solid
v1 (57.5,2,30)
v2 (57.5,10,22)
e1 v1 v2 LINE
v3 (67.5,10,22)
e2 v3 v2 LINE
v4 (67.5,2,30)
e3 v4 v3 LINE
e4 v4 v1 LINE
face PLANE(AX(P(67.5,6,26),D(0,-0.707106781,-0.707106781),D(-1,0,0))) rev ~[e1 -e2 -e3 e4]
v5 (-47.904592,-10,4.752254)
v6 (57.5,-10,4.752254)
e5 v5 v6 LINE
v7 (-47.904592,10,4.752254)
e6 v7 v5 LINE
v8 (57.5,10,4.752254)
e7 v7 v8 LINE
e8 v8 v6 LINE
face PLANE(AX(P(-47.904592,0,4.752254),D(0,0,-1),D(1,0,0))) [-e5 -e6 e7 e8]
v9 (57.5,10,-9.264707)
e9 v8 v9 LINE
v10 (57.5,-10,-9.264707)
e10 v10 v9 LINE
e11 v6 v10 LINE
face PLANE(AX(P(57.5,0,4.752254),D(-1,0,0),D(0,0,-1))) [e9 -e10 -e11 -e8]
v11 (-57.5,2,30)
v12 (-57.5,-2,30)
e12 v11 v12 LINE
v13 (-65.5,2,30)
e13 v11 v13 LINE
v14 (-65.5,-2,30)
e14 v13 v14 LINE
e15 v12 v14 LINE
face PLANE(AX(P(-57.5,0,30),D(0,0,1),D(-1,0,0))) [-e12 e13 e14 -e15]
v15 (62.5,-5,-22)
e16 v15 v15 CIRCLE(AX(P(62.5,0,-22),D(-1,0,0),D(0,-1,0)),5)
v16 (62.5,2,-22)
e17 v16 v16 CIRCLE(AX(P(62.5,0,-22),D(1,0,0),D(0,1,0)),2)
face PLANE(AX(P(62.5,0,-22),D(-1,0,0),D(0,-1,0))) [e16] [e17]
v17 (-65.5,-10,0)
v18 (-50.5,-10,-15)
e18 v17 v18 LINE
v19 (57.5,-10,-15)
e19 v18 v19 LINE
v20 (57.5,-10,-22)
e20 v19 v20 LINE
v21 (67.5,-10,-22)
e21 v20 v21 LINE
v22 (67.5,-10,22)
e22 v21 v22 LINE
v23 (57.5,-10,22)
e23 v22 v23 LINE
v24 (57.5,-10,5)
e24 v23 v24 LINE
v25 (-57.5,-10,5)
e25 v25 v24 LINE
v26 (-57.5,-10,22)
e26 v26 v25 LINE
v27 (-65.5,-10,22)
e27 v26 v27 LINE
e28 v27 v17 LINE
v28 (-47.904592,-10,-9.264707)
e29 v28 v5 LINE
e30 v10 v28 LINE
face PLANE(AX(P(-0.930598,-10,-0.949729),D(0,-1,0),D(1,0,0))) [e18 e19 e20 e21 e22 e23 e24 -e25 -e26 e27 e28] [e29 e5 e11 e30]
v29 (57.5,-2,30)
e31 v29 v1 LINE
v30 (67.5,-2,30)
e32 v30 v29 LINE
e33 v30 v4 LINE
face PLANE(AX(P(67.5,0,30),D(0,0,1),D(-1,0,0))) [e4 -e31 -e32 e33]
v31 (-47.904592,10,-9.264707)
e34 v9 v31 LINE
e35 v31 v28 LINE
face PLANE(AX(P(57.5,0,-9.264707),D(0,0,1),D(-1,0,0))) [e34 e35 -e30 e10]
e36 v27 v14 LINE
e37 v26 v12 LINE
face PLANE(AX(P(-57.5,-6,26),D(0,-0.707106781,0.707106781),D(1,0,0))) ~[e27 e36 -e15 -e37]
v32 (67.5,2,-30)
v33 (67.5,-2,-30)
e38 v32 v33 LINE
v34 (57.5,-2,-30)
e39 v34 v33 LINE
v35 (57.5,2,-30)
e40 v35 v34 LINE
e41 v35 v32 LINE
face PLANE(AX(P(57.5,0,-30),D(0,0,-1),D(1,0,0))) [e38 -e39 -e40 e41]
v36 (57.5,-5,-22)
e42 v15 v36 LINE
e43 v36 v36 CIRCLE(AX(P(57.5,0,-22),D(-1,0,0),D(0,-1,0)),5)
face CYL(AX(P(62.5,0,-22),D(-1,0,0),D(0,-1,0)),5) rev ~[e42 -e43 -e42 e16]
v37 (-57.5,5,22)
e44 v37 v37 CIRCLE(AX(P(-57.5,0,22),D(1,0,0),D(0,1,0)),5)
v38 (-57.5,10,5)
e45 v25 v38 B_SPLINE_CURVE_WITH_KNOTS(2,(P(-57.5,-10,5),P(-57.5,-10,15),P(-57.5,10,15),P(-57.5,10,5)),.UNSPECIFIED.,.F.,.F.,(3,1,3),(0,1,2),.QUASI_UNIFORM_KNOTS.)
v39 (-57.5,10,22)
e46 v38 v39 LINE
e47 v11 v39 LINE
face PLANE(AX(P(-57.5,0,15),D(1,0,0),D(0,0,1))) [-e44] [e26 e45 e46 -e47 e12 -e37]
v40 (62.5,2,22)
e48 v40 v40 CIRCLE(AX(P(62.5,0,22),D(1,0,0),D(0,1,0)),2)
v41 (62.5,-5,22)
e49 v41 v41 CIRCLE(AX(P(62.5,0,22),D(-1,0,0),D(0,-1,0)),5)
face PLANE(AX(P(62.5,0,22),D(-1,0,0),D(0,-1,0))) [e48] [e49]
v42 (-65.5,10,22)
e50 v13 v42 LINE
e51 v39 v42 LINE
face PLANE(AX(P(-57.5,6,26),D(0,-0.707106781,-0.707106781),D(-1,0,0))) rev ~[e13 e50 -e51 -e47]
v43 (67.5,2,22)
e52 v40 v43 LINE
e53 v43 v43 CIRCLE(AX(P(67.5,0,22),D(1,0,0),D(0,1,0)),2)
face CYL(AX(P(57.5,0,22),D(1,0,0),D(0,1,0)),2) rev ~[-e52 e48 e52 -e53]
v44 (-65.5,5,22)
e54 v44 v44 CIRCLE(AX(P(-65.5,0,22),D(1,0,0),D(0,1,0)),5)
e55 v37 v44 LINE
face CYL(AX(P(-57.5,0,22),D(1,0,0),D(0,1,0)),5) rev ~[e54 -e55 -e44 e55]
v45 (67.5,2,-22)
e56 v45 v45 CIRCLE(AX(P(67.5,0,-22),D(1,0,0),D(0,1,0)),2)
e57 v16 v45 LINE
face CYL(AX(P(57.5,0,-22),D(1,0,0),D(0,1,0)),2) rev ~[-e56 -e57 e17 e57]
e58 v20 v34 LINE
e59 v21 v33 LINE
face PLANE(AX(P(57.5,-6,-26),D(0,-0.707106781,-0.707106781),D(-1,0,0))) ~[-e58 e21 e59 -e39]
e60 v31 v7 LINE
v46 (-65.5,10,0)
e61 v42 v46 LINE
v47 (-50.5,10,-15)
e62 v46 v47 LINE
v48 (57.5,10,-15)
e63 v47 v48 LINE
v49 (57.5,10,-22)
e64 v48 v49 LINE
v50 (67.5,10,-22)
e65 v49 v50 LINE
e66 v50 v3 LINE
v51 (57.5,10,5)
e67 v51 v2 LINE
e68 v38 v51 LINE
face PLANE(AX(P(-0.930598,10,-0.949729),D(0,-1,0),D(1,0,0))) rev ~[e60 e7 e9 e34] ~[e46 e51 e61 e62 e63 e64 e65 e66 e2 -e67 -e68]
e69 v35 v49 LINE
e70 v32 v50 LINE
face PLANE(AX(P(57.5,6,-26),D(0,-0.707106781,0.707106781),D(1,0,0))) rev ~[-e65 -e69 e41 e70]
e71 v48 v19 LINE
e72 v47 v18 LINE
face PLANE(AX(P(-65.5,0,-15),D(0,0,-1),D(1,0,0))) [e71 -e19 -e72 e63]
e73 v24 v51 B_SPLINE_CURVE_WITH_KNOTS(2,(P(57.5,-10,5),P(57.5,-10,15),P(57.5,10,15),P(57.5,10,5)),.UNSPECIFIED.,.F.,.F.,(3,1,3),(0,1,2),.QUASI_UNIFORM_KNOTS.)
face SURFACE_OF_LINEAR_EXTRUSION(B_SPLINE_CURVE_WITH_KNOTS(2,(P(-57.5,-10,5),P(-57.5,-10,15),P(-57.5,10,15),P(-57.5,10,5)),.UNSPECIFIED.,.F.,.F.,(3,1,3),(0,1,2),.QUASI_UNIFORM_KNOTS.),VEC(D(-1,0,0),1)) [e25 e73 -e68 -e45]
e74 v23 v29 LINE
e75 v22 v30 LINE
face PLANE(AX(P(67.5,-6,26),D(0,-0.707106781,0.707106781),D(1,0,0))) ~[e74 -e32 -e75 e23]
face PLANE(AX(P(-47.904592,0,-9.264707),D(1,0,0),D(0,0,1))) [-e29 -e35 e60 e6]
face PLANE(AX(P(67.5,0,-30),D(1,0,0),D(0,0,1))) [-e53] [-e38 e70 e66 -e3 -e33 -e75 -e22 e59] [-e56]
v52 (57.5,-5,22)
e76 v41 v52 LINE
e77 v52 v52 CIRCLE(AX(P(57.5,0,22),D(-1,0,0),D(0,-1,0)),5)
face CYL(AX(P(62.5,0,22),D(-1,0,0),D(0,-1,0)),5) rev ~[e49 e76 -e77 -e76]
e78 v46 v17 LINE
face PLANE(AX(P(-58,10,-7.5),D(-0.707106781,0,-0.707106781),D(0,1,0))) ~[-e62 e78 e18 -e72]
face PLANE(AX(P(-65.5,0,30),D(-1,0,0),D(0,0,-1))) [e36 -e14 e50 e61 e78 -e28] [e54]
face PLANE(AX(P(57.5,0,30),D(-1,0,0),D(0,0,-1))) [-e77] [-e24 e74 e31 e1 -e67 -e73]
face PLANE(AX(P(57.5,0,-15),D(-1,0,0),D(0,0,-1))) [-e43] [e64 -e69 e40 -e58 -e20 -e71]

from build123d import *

# Parameters (mm, degrees)
F1_DEPTH       = 10
F2_T1_DEPTH    = 115
F3_SIZE        = 8
F5_D           = 4
F5_DEPTH       = 12
F5_CBORE_D     = 10
F5_CBORE_DEPTH = 5
F5_TIP         = 1.2017212381
F7_D           = 4
F7_DEPTH       = 12
F7_CBORE_D     = 10
F7_CBORE_DEPTH = 5
F7_TIP         = 1.2017212381
F8_SIZE        = 15
F9_R           = 5
F10_DEPTH      = 25


# Not quite as in the source:
# - a fillet or chamfer that OpenCascade refuses, or shapes differently, is made with other operations: its cross-section is extruded or revolved along the edge and cut away or added


with BuildPart() as f1:
    # F0 (on Front) → F1 (new body, symmetric)
    with BuildSketch(Plane.XZ):
        Polygon((57.5, 4.7522541136), (57.5, 15), (-57.5, 15), (-57.5, -15), (57.5, -15), (57.5, -9.264706634), (-47.9045920074, -9.264706634), (-47.9045920074, 4.7522541136), align=None)
        Polygon((57.5, 30), (57.5, 15), (57.5, 4.7522541136), (57.5, -9.264706634), (57.5, -15), (57.5, -30), (67.5, -30), (67.5, -15), (67.5, 15), (67.5, 30), align=None)
        Polygon((-57.5, -15), (-57.5, 15), (-57.5, 30), (-65.5, 30), (-65.5, -15), align=None)
    extrude(amount=F1_DEPTH, both=True)

    # F2: fillet of radius 10 on 2 edges, made by hand

    # F2_s2 → F2_t1 (cut)
    with BuildSketch(Plane.YZ.offset(-57.5)):
        with BuildLine():
            add(Edge.make_bspline(
                [(0, 15), (-10, 15), (-10, 5)],
                knots=[0, 0, 0, 1, 1, 1], degree=2, weights=[1, 1, 1]))
            Line((-10, 5), (-10.2, 5))
            Line((-10.2, 5), (-10.2, 15.2))
            Line((-10.2, 15.2), (0, 15.2))
            Line((0, 15.2), (0, 15))
        make_face()
        with BuildLine():
            add(Edge.make_bspline(
                [(0, 15), (10, 15), (10, 5)],
                knots=[0, 0, 0, 1, 1, 1], degree=2, weights=[1, 1, 1]))
            Line((10, 5), (10.2, 5))
            Line((10.2, 5), (10.2, 15.2))
            Line((10.2, 15.2), (0, 15.2))
            Line((0, 15.2), (0, 15))
        make_face()
    extrude(amount=F2_T1_DEPTH, mode=Mode.SUBTRACT)

    # F3
    f3_edges = [f1.edges().sort_by_distance(p)[0] for p in [
        (62.5, -10, -30),
        (62.5, 10, -30),
        (62.5, 10, 30),
        (62.5, -10, 30),
        (-61.5, -10, 30),
        (-61.5, 10, 30),
    ]]
    chamfer(f3_edges, length=F3_SIZE)

    # F5
    with Locations(Plane(origin=(57.5, 0, 0), x_dir=(0, -1, 0), z_dir=(-1, 0, 0))):
        with Locations((0, 22)):
            CounterBoreHole(F5_D / 2, F5_CBORE_D / 2, F5_CBORE_DEPTH, depth=F5_DEPTH)
            with Locations((0, 0, -(F5_DEPTH + F5_TIP / 2))):  # 118° drill point
                Cone(0, F5_D / 2, F5_TIP, mode=Mode.SUBTRACT)

    # F7
    with Locations(Plane(origin=(57.5, 0, 0), x_dir=(0, -1, 0), z_dir=(-1, 0, 0))):
        with Locations((0, -22)):
            CounterBoreHole(F7_D / 2, F7_CBORE_D / 2, F7_CBORE_DEPTH, depth=F7_DEPTH)
            with Locations((0, 0, -(F7_DEPTH + F7_TIP / 2))):  # 118° drill point
                Cone(0, F7_D / 2, F7_TIP, mode=Mode.SUBTRACT)

    # F8
    f8_edges = [f1.edges().sort_by_distance(p)[0] for p in [
        (-65.5, 0, -15),
    ]]
    chamfer(f8_edges, length=F8_SIZE)

    # F9 (on face) → F10 (cut)
    with BuildSketch(Plane.YZ.offset(-57.5)):
        with Locations((0, 22)):
            Circle(F9_R)
    extrude(amount=-F10_DEPTH, mode=Mode.SUBTRACT)


solid = f1.part
